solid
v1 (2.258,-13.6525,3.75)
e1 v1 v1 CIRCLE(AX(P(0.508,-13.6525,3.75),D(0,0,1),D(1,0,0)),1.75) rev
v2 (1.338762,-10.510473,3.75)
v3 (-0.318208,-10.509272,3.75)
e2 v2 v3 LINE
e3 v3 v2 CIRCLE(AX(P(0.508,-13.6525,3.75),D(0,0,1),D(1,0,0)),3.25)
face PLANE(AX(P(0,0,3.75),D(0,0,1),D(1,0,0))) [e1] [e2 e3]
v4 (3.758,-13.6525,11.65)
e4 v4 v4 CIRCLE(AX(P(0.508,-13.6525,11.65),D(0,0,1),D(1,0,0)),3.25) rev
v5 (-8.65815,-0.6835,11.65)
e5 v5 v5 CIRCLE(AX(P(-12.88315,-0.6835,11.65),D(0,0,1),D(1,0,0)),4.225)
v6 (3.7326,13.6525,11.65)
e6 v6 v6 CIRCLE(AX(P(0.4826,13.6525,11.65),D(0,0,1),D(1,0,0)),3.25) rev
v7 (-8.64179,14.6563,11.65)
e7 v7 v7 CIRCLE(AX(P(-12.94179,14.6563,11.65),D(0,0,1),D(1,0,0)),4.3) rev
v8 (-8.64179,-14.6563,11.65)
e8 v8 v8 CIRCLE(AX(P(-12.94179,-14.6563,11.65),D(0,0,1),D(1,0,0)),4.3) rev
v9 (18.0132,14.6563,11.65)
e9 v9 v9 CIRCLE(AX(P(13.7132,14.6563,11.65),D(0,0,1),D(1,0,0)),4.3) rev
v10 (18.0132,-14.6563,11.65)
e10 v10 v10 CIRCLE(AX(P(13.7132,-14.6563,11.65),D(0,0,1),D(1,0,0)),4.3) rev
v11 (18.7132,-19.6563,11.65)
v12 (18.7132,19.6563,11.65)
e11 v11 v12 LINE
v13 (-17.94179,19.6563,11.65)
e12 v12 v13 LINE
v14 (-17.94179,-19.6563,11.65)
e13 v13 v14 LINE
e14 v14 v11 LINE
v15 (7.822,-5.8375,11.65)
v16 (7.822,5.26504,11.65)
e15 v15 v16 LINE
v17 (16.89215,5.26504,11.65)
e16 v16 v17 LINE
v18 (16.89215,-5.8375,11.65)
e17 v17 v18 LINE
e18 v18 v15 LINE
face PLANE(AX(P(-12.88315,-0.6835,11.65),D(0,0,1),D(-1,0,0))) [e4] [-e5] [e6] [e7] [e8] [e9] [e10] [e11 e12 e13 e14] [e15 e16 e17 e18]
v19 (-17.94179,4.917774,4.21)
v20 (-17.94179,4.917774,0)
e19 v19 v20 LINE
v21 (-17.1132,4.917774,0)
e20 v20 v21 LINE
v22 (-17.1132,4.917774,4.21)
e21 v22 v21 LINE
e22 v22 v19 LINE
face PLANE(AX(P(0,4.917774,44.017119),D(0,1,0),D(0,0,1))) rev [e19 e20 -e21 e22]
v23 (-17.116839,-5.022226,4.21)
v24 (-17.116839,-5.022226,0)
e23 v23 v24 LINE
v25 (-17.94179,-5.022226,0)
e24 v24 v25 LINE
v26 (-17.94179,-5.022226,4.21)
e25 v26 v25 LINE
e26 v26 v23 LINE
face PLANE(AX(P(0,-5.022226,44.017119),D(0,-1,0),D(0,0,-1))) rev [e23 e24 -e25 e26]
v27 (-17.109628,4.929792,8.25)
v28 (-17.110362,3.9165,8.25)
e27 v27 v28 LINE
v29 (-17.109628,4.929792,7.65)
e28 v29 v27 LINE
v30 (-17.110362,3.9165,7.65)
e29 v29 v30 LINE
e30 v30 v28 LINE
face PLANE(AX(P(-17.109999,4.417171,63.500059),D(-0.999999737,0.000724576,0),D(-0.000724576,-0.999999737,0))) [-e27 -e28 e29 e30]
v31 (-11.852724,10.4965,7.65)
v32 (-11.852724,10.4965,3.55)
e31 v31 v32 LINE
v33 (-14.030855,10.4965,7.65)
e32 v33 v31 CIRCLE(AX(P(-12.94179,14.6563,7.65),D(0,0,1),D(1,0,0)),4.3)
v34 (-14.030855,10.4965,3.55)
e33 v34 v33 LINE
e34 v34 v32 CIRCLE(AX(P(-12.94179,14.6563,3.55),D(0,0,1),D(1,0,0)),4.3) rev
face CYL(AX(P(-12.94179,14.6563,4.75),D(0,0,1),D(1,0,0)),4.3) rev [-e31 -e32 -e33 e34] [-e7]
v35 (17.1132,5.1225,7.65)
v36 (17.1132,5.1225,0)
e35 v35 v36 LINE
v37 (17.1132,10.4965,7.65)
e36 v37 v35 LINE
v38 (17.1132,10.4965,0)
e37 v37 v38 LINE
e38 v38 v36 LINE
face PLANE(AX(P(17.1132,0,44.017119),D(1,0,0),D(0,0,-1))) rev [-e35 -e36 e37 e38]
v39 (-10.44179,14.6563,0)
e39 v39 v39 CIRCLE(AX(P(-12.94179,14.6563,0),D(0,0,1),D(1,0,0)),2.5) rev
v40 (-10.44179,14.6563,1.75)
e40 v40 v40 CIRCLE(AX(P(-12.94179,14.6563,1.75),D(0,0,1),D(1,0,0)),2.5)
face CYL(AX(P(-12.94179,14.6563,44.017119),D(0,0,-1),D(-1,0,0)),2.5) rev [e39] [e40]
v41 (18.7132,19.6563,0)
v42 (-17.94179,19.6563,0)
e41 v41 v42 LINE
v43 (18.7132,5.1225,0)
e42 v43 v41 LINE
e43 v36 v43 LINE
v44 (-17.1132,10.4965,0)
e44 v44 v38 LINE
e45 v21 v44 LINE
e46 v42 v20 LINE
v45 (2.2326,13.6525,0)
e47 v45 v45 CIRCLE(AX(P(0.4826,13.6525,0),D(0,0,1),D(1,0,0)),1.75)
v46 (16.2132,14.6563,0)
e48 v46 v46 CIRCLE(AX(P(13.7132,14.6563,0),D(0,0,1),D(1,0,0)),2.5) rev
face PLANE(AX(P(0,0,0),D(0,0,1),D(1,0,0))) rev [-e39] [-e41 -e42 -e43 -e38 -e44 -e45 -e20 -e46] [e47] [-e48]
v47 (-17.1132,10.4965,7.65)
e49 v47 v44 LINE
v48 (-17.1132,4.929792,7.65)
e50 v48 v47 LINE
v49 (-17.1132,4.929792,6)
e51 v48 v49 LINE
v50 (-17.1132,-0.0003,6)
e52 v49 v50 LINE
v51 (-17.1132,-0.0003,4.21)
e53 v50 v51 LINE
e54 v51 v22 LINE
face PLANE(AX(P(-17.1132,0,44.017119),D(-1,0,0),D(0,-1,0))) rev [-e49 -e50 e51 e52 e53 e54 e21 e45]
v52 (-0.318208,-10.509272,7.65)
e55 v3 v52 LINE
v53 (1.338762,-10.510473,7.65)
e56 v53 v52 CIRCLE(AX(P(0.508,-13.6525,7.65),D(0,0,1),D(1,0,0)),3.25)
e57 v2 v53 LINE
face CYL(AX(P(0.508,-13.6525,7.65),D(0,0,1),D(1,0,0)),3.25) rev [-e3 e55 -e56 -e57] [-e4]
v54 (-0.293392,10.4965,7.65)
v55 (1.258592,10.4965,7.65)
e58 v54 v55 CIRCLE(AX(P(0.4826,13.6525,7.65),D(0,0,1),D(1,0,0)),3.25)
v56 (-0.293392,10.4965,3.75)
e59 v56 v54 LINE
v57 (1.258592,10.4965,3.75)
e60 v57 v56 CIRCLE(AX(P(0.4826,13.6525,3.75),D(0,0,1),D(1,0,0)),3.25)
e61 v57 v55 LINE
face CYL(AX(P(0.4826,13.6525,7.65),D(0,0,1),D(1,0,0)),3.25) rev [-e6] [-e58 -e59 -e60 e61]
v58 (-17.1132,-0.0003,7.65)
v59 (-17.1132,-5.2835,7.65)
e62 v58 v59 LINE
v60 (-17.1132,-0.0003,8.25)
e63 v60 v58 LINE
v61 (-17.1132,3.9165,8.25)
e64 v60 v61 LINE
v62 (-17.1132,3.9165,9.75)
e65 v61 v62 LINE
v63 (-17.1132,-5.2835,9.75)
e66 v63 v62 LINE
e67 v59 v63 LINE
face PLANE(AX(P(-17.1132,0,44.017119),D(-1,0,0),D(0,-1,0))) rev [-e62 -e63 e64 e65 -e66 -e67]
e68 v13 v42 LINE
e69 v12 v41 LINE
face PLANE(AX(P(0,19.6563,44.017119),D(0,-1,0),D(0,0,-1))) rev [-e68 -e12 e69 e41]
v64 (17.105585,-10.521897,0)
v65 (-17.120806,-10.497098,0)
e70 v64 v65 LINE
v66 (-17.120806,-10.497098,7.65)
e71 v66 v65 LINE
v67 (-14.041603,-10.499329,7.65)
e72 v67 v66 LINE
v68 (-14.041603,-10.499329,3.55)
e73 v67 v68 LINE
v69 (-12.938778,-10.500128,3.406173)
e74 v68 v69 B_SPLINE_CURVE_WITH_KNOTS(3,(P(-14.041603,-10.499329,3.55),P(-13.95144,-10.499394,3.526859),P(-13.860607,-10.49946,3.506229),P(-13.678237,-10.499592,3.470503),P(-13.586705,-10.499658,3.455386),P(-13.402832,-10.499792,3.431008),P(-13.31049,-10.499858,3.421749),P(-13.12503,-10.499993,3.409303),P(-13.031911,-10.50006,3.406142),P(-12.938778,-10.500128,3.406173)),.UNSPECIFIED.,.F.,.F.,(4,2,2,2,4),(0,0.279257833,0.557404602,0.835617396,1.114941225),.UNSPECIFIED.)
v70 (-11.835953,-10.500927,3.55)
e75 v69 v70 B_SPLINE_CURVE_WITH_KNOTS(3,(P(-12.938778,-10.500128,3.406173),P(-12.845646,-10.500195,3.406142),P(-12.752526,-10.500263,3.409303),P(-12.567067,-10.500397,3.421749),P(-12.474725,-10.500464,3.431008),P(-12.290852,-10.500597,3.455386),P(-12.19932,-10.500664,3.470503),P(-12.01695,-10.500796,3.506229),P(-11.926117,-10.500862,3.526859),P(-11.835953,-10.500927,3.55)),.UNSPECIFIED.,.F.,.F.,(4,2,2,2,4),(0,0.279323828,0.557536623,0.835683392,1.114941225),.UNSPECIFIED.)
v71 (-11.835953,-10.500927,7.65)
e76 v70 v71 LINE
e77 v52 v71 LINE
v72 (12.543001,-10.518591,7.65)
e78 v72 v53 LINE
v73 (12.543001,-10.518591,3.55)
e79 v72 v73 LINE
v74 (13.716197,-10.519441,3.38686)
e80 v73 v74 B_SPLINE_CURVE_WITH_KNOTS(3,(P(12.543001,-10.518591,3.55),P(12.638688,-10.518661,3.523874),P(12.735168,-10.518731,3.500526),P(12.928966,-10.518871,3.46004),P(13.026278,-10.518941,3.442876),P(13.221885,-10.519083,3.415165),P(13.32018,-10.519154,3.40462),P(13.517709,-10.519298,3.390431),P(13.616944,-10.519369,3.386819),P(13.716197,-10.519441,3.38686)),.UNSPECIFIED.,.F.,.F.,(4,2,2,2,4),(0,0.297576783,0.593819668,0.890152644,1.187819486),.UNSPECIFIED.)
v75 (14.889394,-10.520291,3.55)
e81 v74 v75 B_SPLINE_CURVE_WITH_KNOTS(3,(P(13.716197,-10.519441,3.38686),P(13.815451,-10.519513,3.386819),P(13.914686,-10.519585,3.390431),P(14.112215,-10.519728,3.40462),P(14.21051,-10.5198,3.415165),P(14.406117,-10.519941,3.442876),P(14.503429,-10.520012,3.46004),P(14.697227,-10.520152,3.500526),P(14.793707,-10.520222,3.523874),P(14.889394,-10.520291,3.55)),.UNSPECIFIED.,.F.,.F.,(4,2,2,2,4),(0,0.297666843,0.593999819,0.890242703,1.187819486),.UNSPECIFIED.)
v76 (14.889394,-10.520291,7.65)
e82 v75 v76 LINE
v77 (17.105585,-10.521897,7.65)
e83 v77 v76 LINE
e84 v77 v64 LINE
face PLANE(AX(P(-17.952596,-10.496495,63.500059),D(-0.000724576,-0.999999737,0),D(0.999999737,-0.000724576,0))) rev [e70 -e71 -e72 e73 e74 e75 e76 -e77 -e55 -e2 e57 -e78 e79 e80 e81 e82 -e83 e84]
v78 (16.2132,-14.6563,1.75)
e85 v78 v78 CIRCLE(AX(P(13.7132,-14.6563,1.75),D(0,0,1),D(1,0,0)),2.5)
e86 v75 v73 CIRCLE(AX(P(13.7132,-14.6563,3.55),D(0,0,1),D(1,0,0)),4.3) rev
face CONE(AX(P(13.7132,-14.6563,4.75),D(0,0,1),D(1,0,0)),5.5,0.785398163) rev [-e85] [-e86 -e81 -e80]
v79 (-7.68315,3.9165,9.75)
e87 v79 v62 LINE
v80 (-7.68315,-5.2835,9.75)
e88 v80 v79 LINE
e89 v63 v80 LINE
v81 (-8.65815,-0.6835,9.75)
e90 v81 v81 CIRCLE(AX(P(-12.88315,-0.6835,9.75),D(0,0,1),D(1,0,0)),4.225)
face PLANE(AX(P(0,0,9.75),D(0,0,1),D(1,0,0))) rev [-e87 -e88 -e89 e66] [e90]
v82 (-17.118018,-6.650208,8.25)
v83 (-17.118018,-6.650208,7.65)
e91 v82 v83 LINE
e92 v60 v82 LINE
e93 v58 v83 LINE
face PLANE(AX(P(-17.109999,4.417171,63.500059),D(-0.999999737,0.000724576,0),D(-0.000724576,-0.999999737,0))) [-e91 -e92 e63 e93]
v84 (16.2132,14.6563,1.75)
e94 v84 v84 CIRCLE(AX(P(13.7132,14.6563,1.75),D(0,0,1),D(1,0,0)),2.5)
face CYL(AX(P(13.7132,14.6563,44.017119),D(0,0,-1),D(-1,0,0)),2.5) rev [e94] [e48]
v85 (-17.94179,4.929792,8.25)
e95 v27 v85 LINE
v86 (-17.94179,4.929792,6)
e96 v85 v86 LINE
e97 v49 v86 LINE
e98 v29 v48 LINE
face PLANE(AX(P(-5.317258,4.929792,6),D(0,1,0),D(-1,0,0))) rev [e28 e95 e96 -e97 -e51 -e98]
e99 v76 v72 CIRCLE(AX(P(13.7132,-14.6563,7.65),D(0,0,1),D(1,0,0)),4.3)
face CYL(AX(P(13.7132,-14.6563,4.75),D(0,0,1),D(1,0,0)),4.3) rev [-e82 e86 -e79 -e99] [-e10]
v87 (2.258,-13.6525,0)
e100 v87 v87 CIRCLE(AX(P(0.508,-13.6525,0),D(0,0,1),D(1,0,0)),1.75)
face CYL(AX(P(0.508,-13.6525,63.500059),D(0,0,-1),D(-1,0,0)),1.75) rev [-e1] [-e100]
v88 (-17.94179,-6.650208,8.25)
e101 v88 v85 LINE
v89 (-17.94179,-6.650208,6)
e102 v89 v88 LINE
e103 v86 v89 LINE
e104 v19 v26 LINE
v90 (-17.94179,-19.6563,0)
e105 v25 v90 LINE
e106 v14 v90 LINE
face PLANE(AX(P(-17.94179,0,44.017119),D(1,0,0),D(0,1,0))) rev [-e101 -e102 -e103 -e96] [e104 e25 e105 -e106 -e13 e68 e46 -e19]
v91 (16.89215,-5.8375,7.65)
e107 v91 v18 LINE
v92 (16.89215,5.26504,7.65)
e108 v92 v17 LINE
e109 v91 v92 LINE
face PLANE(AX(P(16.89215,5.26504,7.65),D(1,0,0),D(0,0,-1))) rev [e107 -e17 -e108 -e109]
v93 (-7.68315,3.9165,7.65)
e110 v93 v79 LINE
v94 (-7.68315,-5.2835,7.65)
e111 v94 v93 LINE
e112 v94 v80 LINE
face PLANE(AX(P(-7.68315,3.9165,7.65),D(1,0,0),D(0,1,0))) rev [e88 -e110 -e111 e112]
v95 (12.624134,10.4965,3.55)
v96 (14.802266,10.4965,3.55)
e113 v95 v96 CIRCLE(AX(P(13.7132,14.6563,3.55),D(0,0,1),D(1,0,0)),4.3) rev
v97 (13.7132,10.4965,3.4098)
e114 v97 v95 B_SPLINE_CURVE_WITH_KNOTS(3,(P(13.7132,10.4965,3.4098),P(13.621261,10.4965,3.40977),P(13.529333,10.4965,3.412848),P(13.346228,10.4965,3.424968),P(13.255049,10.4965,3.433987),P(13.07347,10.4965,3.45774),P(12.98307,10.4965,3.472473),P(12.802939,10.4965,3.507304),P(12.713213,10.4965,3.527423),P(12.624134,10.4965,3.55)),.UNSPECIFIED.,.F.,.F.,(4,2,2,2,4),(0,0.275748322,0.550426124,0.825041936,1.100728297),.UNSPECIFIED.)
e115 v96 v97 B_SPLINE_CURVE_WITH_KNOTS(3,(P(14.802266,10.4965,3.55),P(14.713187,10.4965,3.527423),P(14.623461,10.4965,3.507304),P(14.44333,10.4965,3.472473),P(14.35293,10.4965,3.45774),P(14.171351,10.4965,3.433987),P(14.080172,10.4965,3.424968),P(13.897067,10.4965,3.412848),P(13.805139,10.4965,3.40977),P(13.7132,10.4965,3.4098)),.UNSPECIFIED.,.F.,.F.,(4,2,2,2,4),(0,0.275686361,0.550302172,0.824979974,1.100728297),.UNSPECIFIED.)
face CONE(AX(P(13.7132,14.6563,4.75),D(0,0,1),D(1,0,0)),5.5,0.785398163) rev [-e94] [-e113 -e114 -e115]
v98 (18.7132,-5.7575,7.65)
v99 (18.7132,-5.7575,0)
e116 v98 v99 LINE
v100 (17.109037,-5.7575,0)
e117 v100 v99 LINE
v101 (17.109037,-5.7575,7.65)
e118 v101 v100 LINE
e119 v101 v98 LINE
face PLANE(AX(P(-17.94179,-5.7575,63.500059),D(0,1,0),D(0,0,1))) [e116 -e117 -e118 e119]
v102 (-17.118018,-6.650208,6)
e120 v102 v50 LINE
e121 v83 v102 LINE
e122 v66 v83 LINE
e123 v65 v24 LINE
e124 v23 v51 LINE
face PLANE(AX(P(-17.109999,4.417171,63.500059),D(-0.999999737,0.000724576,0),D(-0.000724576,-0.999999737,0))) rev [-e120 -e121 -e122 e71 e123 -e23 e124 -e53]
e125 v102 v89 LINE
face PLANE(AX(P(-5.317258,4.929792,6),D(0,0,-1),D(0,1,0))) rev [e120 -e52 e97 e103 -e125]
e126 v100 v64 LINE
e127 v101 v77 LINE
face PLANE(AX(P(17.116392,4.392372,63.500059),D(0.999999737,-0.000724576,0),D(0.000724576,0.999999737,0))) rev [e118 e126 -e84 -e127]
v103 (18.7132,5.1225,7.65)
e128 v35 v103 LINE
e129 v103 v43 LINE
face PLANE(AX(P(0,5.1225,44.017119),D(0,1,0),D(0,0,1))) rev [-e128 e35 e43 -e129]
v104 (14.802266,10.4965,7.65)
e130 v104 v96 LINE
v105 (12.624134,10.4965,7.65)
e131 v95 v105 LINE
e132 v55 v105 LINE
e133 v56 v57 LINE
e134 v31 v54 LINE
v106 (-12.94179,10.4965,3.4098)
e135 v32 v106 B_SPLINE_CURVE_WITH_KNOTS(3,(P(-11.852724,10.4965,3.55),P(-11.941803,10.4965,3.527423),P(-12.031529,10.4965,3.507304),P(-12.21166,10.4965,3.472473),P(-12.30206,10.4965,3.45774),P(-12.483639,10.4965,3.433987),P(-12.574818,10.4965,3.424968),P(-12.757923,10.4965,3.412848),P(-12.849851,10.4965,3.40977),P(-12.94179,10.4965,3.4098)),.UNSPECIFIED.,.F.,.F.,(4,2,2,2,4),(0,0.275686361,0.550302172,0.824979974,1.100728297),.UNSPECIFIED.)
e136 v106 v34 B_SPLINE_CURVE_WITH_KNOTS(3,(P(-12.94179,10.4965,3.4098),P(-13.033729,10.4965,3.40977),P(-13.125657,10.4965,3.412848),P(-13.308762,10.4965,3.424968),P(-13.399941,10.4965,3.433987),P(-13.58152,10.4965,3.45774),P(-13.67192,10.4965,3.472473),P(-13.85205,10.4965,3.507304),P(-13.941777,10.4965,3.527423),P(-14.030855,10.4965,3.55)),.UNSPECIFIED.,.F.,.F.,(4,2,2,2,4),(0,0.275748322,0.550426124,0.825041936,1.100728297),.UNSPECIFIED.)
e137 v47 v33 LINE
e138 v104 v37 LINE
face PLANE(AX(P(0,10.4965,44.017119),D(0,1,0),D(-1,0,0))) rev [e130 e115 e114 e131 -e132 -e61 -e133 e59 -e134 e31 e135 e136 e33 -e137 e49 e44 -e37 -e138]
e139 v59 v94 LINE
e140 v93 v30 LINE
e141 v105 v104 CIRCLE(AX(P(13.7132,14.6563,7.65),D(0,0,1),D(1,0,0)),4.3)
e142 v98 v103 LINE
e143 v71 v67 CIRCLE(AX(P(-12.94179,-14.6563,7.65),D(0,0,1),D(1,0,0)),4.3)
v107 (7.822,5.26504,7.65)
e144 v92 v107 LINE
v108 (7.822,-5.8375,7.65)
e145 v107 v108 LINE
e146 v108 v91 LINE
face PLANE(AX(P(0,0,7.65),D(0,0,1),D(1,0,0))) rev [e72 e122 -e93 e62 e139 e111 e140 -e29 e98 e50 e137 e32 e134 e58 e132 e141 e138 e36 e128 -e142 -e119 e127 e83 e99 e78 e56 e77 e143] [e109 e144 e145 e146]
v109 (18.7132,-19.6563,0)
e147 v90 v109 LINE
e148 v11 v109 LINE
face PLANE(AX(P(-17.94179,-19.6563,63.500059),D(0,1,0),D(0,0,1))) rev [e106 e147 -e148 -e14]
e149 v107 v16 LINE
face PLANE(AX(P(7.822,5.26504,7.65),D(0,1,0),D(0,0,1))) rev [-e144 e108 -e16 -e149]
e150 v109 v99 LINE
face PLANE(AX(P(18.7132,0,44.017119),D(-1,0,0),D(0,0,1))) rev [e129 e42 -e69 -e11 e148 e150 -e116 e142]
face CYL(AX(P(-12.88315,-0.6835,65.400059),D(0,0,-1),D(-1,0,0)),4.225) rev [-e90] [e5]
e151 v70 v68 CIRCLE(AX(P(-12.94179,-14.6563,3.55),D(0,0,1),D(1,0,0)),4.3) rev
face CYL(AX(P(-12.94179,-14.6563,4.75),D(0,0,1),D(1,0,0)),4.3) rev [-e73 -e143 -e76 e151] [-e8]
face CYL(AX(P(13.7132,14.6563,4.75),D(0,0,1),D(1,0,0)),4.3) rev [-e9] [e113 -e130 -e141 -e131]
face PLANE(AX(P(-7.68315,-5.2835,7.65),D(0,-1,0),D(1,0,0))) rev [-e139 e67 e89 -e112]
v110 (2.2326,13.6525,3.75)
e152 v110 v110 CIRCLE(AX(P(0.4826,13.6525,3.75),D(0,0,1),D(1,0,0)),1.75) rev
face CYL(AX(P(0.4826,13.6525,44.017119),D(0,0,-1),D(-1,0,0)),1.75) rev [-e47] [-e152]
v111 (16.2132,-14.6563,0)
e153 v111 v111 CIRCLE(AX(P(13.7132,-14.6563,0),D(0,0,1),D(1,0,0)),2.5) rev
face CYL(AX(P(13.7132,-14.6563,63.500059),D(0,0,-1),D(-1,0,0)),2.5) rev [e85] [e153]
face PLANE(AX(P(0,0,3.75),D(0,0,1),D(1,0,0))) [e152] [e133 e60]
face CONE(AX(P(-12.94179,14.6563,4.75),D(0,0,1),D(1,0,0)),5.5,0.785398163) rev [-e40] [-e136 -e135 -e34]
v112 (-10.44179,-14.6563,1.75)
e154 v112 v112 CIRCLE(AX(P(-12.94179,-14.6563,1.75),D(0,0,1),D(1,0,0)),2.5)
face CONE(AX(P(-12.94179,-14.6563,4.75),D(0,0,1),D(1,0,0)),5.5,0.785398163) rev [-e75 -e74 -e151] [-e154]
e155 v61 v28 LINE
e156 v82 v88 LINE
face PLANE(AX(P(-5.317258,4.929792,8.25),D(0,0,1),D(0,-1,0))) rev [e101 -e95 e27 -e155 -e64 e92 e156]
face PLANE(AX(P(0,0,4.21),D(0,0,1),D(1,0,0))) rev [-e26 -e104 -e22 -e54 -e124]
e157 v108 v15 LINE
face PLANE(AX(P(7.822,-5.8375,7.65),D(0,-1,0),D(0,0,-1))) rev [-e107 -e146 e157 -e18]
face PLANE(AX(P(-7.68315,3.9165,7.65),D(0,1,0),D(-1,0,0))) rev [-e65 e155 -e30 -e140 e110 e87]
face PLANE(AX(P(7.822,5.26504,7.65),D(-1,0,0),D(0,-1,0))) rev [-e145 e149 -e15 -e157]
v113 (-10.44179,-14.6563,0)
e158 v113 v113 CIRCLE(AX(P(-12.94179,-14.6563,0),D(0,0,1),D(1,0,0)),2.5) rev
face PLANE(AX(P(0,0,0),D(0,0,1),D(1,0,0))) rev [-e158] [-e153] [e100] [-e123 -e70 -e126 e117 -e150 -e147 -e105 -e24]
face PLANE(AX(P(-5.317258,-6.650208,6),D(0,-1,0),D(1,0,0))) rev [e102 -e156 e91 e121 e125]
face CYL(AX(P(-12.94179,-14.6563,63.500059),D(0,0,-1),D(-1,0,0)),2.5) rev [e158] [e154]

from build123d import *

# Parameters (mm, degrees)
BOSS_EXTRUDE1_OUTLINE_R   = 2.5
BOSS_EXTRUDE1_OUTLINE_R_2 = 1.75
BOSS_EXTRUDE1_DEPTH       = 4.21
BOSS_EXTRUDE2_START       = 4.21
BOSS_EXTRUDE2_OUTLINE_R   = 2.5
BOSS_EXTRUDE2_OUTLINE_R_2 = 1.75
BOSS_EXTRUDE2_DEPTH       = 5.539999985
BOSS_EXTRUDE3_START       = -2.1
SKETCH3_W                 = 36.654989836
SKETCH3_H                 = 39.3126
SKETCH3_R                 = 2.5
SKETCH3_R_2               = 3.25
SKETCH3_W_2               = 9.43005
SKETCH3_H_2               = 9.2
SKETCH3_W_3               = 9.07015
SKETCH3_H_3               = 11.10254
BOSS_EXTRUDE3_DEPTH       = 2.1
CUT_EXTRUDE1_START        = -6
SKETCH3_2_R               = 3.25
SKETCH3_2_R_2             = 1.75
CUT_EXTRUDE1_DEPTH        = 6
SKETCH5_R                 = 4.3
CUT_EXTRUDE2_DEPTH        = 5
CHAMFER1_SIZE             = 3
CUT_EXTRUDE3_REACH        = 44.72
SKETCH6_W                 = 2.25
SKETCH6_H                 = 11.58
BOSS_EXTRUDE5_START       = 1.9
SKETCH7_W                 = 36.654989836
SKETCH7_H                 = 39.3126
SKETCH7_R                 = 4.3
SKETCH7_R_2               = 3.25
SKETCH7_W_2               = 10.43005
SKETCH7_H_2               = 10.2
SKETCH7_W_3               = 9.07015
SKETCH7_H_3               = 11.10254
SKETCH7_W_4               = 9.43005
SKETCH7_H_4               = 9.2
SKETCH7_R_3               = 4.225
BOSS_EXTRUDE5_DEPTH       = 1.9


# Read off the part's stored shape, not the designer's step: Boss-Extrude1, Boss-Extrude2
with BuildPart() as part:
    # Boss-Extrude1 outline → Boss-Extrude1 (new body)
    # profile 1 of 2: a face of its own
    with BuildSketch(Plane.XY):
        Polygon((17.1132, 10.4965), (17.1132, 5.1225), (18.7132, 5.1225), (18.7132, 19.6563), (-17.941789836, 19.6563), (-17.941789836, 4.917774053), (-17.1132, 4.917774053), (-17.1132, 10.4965), align=None)
        with Locations((-12.941789836, 14.6563)):
            Circle(BOSS_EXTRUDE1_OUTLINE_R, mode=Mode.SUBTRACT)
        with Locations((0.4826, 13.6525)):
            Circle(BOSS_EXTRUDE1_OUTLINE_R_2, mode=Mode.SUBTRACT)
        with Locations((13.7132, 14.6563)):
            Circle(BOSS_EXTRUDE1_OUTLINE_R, mode=Mode.SUBTRACT)
    # profile 2 of 2: a face of its own
    with BuildSketch(Plane.XY):
        Polygon((18.7132, -19.6563), (18.7132, -5.7575), (17.109037456, -5.7575), (17.105585288, -10.521897241), (-17.120805727, -10.497097621), (-17.116838767, -5.022225947), (-17.941789836, -5.022225947), (-17.941789836, -19.6563), align=None)
        with Locations((-12.941789836, -14.6563)):
            Circle(BOSS_EXTRUDE1_OUTLINE_R, mode=Mode.SUBTRACT)
        with Locations((0.508, -13.6525)):
            Circle(BOSS_EXTRUDE1_OUTLINE_R_2, mode=Mode.SUBTRACT)
        with Locations((13.7132, -14.6563)):
            Circle(BOSS_EXTRUDE1_OUTLINE_R, mode=Mode.SUBTRACT)
    extrude(amount=BOSS_EXTRUDE1_DEPTH)

    # Boss-Extrude2 outline → Boss-Extrude2 (add)
    with BuildSketch(Plane.XY.offset(BOSS_EXTRUDE2_START)):
        Polygon((17.1132, 10.4965), (17.1132, 5.1225), (18.7132, 5.1225), (18.7132, 19.6563), (-17.941789836, 19.6563), (-17.941789836, -19.6563), (18.7132, -19.6563), (18.7132, -5.7575), (17.109037456, -5.7575), (17.105585288, -10.521897241), (-17.120805727, -10.497097621), (-17.1132, -0.000300188), (-17.1132, 10.4965), align=None)
        with Locations((-12.941789836, -14.6563)):
            Circle(BOSS_EXTRUDE2_OUTLINE_R, mode=Mode.SUBTRACT)
        with Locations((0.508, -13.6525)):
            Circle(BOSS_EXTRUDE2_OUTLINE_R_2, mode=Mode.SUBTRACT)
        with Locations((13.7132, -14.6563)):
            Circle(BOSS_EXTRUDE2_OUTLINE_R, mode=Mode.SUBTRACT)
        with Locations((-12.941789836, 14.6563)):
            Circle(BOSS_EXTRUDE2_OUTLINE_R, mode=Mode.SUBTRACT)
        with Locations((0.4826, 13.6525)):
            Circle(BOSS_EXTRUDE2_OUTLINE_R_2, mode=Mode.SUBTRACT)
        with Locations((13.7132, 14.6563)):
            Circle(BOSS_EXTRUDE2_OUTLINE_R, mode=Mode.SUBTRACT)
    extrude(amount=BOSS_EXTRUDE2_DEPTH)

    # Sketch3 → Boss-Extrude3 (add)
    with BuildSketch(Plane.XY.offset(9.749999985).offset(BOSS_EXTRUDE3_START)):
        with Locations((0.385705082, 0)):
            Rectangle(SKETCH3_W, SKETCH3_H)
        with Locations((-12.941789836, 14.6563)):
            Circle(SKETCH3_R, mode=Mode.SUBTRACT)
        with Locations((13.7132, 14.6563)):
            Circle(SKETCH3_R, mode=Mode.SUBTRACT)
        with Locations((-12.941789836, -14.6563)):
            Circle(SKETCH3_R, mode=Mode.SUBTRACT)
        with Locations((13.7132, -14.6563)):
            Circle(SKETCH3_R, mode=Mode.SUBTRACT)
        with Locations((0.508, -13.6525)):
            Circle(SKETCH3_R_2, mode=Mode.SUBTRACT)
        with Locations((0.4826, 13.6525)):
            Circle(SKETCH3_R_2, mode=Mode.SUBTRACT)
        with Locations((-12.398175, -0.6835)):
            Rectangle(SKETCH3_W_2, SKETCH3_H_2, mode=Mode.SUBTRACT)
        with Locations((12.357075, -0.28623)):
            Rectangle(SKETCH3_W_3, SKETCH3_H_3, mode=Mode.SUBTRACT)
    extrude(amount=BOSS_EXTRUDE3_DEPTH)

    # Sketch3<2> → Cut-Extrude1 (cut)
    # profile 1 of 2: a face of its own
    with BuildSketch(Plane.XY.offset(9.749999985).offset(CUT_EXTRUDE1_START)):
        with Locations((0.4826, 13.6525)):
            Circle(SKETCH3_2_R)
        with Locations((0.4826, 13.6525)):
            Circle(SKETCH3_2_R_2, mode=Mode.SUBTRACT)
    # profile 2 of 2: a face of its own
    with BuildSketch(Plane.XY.offset(9.749999985).offset(CUT_EXTRUDE1_START)):
        with Locations((0.508, -13.6525)):
            Circle(SKETCH3_2_R)
        with Locations((0.508, -13.6525)):
            Circle(SKETCH3_2_R_2, mode=Mode.SUBTRACT)
    extrude(amount=CUT_EXTRUDE1_DEPTH, mode=Mode.SUBTRACT)

    # Sketch5 → Cut-Extrude2 (cut)
    with BuildSketch(Plane.XY.offset(9.749999985)):
        with Locations((-12.941789836, 14.6563)):
            Circle(SKETCH5_R)
        with Locations((13.7132, 14.6563)):
            Circle(SKETCH5_R)
        with Locations((-12.941789836, -14.6563)):
            Circle(SKETCH5_R)
        with Locations((13.7132, -14.6563)):
            Circle(SKETCH5_R)
    extrude(amount=-CUT_EXTRUDE2_DEPTH, mode=Mode.SUBTRACT)

    # Chamfer1
    # the kernel refuses this chamfer: 3 mm, written as the material it takes off along each edge
    with BuildSketch(Plane(origin=(13.7132, 14.6563, 4.749999985), x_dir=(1, 0, 0), z_dir=(0, 1, 0))) as chamfer1_piece_1_section:
        Polygon((2.5 + CHAMFER1_SIZE, 0), (2.5, CHAMFER1_SIZE), (2.5, 0), align=None)
    chamfer1_piece_1 = revolve(axis=Axis((13.7132, 14.6563, 4.749999985), (0, 0, -1)), mode=Mode.PRIVATE)
    chamfer1_piece_1 = chamfer1_piece_1 & Plane(origin=(13.7132, 14.6563, 2.638456685), x_dir=(1, 0, 0), z_dir=(0, 0, 1)) * Cylinder(4.3, 22, mode=Mode.PRIVATE)
    add(chamfer1_piece_1, mode=Mode.SUBTRACT)
    with BuildSketch(Plane(origin=(-12.941789836, -14.6563, 4.749999985), x_dir=(1, 0, 0), z_dir=(0, 1, 0))) as chamfer1_piece_2_section:
        Polygon((2.5 + CHAMFER1_SIZE, 0), (2.5, CHAMFER1_SIZE), (2.5, 0), align=None)
    chamfer1_piece_2 = revolve(axis=Axis((-12.941789836, -14.6563, 4.749999985), (0, 0, -1)), mode=Mode.PRIVATE)
    chamfer1_piece_2 = chamfer1_piece_2 & Plane(origin=(-12.941789836, -14.6563, 2.638456685), x_dir=(1, 0, 0), z_dir=(0, 0, 1)) * Cylinder(4.3, 22, mode=Mode.PRIVATE)
    add(chamfer1_piece_2, mode=Mode.SUBTRACT)
    with BuildSketch(Plane(origin=(13.7132, -14.6563, 4.749999985), x_dir=(1, 0, 0), z_dir=(0, 1, 0))) as chamfer1_piece_3_section:
        Polygon((2.5 + CHAMFER1_SIZE, 0), (2.5, CHAMFER1_SIZE), (2.5, 0), align=None)
    chamfer1_piece_3 = revolve(axis=Axis((13.7132, -14.6563, 4.749999985), (0, 0, -1)), mode=Mode.PRIVATE)
    chamfer1_piece_3 = chamfer1_piece_3 & Plane(origin=(13.7132, -14.6563, 2.638456685), x_dir=(1, 0, 0), z_dir=(0, 0, 1)) * Cylinder(4.3, 22, mode=Mode.PRIVATE)
    add(chamfer1_piece_3, mode=Mode.SUBTRACT)
    with BuildSketch(Plane(origin=(-12.941789836, 14.6563, 4.749999985), x_dir=(1, 0, 0), z_dir=(0, 1, 0))) as chamfer1_piece_4_section:
        Polygon((2.5 + CHAMFER1_SIZE, 0), (2.5, CHAMFER1_SIZE), (2.5, 0), align=None)
    chamfer1_piece_4 = revolve(axis=Axis((-12.941789836, 14.6563, 4.749999985), (0, 0, -1)), mode=Mode.PRIVATE)
    chamfer1_piece_4 = chamfer1_piece_4 & Plane(origin=(-12.941789836, 14.6563, 2.638456685), x_dir=(1, 0, 0), z_dir=(0, 0, 1)) * Cylinder(4.3, 22, mode=Mode.PRIVATE)
    add(chamfer1_piece_4, mode=Mode.SUBTRACT)

    # Cut-Extrude3: up to this face of the body (flat: up to its plane)
    cut_extrude3_end = Plane(part.part.faces().sort_by_distance((-17.118822247, -7.759661784, 2.105))[0])
    # Sketch6 → Cut-Extrude3 (cut, up to the picked face)
    with BuildSketch(Plane.ZY.offset(17.941789836), mode=Mode.PRIVATE) as cut_extrude3_sk1:
        with Locations((7.124999985, -0.86020819)):
            Rectangle(SKETCH6_W, SKETCH6_H)
    cut_extrude3_tool1 = split(extrude(cut_extrude3_sk1.sketch, amount=-CUT_EXTRUDE3_REACH, mode=Mode.PRIVATE), bisect_by=cut_extrude3_end, keep=Keep.BOTH, mode=Mode.PRIVATE)
    add(cut_extrude3_tool1.solids().sort_by(Axis((-17.94179, -0.860208, 7.125), (1, 0, 0)))[0], mode=Mode.SUBTRACT)

    # Sketch7 → Boss-Extrude5 (add)
    # profile 1 of 3: a face of its own
    with BuildSketch(Plane.XY.offset(9.749999985).offset(BOSS_EXTRUDE5_START)):
        with Locations((0.385705082, 0)):
            Rectangle(SKETCH7_W, SKETCH7_H)
        with Locations((13.7132, 14.6563)):
            Circle(SKETCH7_R, mode=Mode.SUBTRACT)
        with Locations((13.7132, -14.6563)):
            Circle(SKETCH7_R, mode=Mode.SUBTRACT)
        with Locations((0.4826, 13.6525)):
            Circle(SKETCH7_R_2, mode=Mode.SUBTRACT)
        with Locations((0.508, -13.6525)):
            Circle(SKETCH7_R_2, mode=Mode.SUBTRACT)
        with Locations((-12.941789836, 14.6563)):
            Circle(SKETCH7_R, mode=Mode.SUBTRACT)
        with Locations((-12.941789836, -14.6563)):
            Circle(SKETCH7_R, mode=Mode.SUBTRACT)
        with Locations((-12.398175, -0.6835)):
            Rectangle(SKETCH7_W_2, SKETCH7_H_2, mode=Mode.SUBTRACT)
        with Locations((12.357075, -0.28623)):
            Rectangle(SKETCH7_W_3, SKETCH7_H_3, mode=Mode.SUBTRACT)
    # profile 2 of 3: a face of its own
    with BuildSketch(Plane.XY.offset(9.749999985).offset(BOSS_EXTRUDE5_START)):
        with Locations((-12.398175, -0.6835)):
            Rectangle(SKETCH7_W_2, SKETCH7_H_2)
        with Locations((-12.398175, -0.6835)):
            Rectangle(SKETCH7_W_4, SKETCH7_H_4, mode=Mode.SUBTRACT)
    # profile 3 of 3: a face of its own
    with BuildSketch(Plane.XY.offset(9.749999985).offset(BOSS_EXTRUDE5_START)):
        with Locations((-12.398175, -0.6835)):
            Rectangle(SKETCH7_W_4, SKETCH7_H_4)
        with Locations((-12.88315, -0.6835)):
            Circle(SKETCH7_R_3, mode=Mode.SUBTRACT)
    extrude(amount=-BOSS_EXTRUDE5_DEPTH)


solid = part.part
